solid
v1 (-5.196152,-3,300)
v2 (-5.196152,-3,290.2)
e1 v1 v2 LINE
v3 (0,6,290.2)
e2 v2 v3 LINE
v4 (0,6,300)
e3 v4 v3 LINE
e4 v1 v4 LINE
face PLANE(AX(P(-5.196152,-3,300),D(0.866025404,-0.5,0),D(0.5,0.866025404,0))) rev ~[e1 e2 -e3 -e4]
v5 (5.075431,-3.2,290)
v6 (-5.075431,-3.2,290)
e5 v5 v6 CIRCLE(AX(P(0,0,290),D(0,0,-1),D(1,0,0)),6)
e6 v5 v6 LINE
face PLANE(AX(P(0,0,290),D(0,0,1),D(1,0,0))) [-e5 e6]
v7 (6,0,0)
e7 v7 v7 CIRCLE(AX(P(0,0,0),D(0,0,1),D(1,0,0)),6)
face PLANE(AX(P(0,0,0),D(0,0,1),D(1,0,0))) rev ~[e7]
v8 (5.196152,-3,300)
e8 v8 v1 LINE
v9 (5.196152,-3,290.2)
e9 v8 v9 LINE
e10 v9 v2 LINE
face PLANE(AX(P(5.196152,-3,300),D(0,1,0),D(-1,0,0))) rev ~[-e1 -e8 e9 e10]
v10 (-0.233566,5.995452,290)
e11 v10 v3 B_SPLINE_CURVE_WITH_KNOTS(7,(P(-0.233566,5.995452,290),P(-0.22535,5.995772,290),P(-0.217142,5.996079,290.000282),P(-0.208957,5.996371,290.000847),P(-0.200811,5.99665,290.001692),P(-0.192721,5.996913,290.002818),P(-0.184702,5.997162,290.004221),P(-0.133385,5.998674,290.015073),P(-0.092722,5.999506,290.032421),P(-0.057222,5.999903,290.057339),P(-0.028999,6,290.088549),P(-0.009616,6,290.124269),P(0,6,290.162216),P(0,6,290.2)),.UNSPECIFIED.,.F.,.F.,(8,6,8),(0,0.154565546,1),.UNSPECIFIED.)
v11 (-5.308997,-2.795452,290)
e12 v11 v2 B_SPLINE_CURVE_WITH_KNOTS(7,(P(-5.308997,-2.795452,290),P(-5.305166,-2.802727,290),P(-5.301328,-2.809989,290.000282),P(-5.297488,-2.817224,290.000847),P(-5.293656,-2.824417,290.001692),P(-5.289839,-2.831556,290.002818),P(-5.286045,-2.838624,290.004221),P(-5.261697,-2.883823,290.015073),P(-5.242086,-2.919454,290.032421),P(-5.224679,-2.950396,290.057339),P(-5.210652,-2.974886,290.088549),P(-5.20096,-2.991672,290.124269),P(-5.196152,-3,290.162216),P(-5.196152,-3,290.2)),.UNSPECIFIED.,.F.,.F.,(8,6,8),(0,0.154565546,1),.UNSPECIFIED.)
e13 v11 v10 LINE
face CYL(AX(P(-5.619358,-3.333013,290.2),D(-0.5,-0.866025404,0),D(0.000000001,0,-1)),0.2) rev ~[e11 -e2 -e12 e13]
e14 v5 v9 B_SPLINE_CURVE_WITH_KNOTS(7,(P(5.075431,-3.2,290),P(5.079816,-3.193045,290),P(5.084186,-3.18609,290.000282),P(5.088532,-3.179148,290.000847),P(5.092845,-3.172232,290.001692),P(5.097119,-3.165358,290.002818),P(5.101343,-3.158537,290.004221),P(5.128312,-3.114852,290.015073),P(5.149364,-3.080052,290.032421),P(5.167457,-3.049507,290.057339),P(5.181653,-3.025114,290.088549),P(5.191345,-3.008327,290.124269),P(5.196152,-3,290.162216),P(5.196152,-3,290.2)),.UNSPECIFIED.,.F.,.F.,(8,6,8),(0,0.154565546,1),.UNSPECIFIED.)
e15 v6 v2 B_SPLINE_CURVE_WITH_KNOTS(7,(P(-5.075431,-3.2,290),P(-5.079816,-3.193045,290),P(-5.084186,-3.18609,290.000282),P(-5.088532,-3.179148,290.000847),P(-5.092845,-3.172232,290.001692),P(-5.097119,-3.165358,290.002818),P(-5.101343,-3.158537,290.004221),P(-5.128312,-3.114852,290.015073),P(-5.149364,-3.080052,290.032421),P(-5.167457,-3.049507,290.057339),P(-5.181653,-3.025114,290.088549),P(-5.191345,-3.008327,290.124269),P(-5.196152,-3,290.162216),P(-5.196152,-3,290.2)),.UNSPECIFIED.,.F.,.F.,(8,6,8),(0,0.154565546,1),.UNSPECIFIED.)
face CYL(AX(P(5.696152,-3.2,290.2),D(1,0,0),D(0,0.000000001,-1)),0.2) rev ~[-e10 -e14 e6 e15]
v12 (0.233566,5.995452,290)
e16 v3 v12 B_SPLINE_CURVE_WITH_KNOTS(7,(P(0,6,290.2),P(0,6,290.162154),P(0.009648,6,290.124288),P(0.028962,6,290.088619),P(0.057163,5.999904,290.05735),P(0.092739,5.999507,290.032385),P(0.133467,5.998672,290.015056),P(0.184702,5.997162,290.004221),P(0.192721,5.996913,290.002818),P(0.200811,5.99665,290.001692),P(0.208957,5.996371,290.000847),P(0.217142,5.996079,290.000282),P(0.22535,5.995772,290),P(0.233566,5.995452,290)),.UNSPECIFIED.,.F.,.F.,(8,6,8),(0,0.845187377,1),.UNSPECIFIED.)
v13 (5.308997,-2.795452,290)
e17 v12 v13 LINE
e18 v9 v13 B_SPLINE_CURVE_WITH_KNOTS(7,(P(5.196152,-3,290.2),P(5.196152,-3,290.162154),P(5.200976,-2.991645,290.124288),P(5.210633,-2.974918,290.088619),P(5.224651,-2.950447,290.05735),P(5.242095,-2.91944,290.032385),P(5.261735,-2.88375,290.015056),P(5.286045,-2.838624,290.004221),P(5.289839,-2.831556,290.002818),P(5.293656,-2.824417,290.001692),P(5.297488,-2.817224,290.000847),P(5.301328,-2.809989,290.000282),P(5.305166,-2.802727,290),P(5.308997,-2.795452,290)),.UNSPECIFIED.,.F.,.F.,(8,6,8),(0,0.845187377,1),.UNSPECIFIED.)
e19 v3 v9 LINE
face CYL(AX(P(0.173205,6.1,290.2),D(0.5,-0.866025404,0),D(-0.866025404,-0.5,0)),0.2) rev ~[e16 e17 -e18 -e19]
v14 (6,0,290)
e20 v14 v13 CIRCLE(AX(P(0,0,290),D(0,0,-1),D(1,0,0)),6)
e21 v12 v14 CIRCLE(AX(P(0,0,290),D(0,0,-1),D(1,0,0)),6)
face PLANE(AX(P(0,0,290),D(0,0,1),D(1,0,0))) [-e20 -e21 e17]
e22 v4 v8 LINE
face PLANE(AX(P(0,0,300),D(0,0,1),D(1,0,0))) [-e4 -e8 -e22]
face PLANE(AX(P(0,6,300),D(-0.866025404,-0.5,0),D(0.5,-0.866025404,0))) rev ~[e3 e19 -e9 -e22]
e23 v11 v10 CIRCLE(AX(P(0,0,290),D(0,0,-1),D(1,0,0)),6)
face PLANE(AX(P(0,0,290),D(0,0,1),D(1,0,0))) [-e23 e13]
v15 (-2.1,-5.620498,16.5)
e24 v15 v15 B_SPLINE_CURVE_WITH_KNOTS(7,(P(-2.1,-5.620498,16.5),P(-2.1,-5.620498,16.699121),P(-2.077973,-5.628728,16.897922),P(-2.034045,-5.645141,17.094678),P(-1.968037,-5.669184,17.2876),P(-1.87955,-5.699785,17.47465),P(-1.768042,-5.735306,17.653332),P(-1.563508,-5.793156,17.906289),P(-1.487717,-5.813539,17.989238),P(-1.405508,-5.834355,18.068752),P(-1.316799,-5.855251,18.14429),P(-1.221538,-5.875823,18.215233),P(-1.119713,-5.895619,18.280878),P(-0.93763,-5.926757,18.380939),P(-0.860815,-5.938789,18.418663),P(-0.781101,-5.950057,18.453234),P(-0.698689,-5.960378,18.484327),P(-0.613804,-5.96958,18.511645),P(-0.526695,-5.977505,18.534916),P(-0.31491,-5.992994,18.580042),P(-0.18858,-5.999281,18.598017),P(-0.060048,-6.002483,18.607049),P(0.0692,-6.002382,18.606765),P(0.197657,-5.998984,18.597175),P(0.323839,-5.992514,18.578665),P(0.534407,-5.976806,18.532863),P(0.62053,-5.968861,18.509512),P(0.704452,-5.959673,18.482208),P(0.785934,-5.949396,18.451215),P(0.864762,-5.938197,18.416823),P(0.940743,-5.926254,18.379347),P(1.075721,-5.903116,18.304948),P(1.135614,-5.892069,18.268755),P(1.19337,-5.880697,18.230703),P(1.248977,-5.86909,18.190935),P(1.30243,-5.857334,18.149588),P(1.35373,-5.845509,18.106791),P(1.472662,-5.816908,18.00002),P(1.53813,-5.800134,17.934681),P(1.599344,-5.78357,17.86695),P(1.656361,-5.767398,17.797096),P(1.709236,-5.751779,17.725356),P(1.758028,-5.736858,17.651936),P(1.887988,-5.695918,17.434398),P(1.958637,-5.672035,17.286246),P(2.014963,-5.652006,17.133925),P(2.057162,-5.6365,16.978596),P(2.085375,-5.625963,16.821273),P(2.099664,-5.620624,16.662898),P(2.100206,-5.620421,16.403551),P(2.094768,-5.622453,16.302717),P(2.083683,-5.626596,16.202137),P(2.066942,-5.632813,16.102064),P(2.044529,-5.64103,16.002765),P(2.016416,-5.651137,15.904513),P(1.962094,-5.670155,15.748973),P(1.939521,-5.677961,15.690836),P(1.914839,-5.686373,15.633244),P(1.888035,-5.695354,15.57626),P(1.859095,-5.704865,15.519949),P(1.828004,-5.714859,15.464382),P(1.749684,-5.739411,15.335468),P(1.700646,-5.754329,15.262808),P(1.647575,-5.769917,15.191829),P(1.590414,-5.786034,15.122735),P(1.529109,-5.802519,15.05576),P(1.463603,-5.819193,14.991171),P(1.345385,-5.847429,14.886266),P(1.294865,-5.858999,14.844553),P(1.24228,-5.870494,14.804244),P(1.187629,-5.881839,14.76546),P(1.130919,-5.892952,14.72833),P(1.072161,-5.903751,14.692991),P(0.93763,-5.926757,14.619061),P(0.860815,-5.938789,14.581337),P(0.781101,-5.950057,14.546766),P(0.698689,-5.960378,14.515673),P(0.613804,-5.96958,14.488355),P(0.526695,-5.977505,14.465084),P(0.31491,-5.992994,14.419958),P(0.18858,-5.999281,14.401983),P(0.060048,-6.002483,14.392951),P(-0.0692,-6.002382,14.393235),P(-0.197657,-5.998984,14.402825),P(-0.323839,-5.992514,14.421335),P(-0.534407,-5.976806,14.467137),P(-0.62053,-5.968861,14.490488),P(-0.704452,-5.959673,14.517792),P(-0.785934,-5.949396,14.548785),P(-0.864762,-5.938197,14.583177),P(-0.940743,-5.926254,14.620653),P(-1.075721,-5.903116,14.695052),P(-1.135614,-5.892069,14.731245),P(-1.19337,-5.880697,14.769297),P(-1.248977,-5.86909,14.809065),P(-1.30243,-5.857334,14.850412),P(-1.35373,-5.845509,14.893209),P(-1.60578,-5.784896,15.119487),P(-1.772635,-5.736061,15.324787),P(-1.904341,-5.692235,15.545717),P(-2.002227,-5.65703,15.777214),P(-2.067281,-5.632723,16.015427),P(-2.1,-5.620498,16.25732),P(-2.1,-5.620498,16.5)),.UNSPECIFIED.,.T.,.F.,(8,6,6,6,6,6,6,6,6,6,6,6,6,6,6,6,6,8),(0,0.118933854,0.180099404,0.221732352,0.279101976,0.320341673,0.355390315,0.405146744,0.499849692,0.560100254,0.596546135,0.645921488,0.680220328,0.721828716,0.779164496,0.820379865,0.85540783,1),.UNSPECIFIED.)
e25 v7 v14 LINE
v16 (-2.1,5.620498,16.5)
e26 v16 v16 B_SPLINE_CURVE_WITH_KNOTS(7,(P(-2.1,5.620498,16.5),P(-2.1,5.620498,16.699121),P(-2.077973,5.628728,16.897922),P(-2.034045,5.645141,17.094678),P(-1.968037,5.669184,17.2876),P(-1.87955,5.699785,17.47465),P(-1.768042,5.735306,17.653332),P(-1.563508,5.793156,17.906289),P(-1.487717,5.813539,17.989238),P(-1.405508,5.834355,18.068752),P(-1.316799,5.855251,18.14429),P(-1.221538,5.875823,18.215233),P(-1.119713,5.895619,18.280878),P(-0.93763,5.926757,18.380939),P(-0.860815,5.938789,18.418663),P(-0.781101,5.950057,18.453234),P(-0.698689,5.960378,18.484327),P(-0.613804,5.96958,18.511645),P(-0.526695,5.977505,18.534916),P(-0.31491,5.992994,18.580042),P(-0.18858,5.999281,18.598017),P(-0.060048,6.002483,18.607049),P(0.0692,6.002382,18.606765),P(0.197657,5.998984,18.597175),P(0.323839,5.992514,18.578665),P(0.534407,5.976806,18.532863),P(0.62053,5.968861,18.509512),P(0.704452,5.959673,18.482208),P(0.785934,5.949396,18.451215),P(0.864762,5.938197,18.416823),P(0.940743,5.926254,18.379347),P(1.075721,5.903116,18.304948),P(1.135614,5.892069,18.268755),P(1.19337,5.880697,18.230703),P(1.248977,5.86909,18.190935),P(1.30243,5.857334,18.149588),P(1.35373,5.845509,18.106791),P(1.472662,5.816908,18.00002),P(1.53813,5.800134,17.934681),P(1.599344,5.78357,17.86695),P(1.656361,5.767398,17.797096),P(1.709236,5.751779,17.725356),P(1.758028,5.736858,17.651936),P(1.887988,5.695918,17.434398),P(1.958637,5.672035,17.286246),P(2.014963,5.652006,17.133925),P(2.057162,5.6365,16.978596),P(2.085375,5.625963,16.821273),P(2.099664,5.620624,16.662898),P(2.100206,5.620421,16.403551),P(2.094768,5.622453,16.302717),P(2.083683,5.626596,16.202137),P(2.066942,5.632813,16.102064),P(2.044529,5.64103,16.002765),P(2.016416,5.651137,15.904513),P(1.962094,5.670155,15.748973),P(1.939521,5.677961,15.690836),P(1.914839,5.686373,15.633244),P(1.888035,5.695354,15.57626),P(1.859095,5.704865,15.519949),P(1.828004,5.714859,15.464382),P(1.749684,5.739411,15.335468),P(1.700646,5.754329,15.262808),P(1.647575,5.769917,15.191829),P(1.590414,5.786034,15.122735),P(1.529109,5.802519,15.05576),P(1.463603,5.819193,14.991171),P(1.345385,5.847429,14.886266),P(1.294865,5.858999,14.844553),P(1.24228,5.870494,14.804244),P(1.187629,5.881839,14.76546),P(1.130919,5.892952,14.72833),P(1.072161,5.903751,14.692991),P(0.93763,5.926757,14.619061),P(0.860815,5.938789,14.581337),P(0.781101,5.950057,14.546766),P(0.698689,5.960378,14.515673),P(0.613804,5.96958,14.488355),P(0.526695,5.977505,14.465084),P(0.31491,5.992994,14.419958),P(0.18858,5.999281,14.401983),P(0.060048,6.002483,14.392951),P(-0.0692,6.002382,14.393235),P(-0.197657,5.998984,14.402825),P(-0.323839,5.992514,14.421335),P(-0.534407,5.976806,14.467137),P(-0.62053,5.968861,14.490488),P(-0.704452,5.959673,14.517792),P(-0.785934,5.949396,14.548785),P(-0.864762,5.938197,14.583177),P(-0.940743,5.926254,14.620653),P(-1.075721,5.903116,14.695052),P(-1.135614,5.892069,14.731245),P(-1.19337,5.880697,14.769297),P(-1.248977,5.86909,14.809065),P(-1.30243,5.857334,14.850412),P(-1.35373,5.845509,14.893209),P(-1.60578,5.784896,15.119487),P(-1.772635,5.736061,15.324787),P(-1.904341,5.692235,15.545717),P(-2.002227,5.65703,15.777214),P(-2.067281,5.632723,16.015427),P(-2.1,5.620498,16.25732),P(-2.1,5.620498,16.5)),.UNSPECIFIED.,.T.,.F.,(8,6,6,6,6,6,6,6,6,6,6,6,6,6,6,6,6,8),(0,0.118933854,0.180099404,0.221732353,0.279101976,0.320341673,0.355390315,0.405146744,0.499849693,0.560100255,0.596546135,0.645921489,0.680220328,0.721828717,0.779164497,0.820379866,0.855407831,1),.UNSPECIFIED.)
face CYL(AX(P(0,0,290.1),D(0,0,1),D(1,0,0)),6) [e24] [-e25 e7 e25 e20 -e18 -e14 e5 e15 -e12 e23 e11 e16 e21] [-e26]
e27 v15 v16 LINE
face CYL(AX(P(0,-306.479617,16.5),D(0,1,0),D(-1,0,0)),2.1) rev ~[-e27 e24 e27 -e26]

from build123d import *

# Parameters (mm, degrees)
F0_R        = 6
F1_DEPTH    = 300
F2_R        = 11
F3_DEPTH    = 10
F4_T4_DEPTH = 11.3923048454
F4_S5_R     = 6
F4_T6_DEPTH = 7
F5_T4_DEPTH = 11.3923048454
F5_S5_R     = 6
F5_T6_DEPTH = 7
F6_R        = 0.2
F9_D        = 4.2


# Not quite as in the source:
# - a fillet or chamfer that OpenCascade refuses, or shapes differently, is made with other operations: its cross-section is extruded or revolved along the edge and cut away or added


with BuildPart() as f1:
    # F0 (on Top) → F1 (new body)
    with BuildSketch(Plane.XY):
        Circle(F0_R)
    extrude(amount=F1_DEPTH)

    # F2 (on face) → F3 (cut)
    with BuildSketch(Plane.XY.offset(300)):
        Circle(F2_R)
        Polygon((5.1961524227, -3), (-5.1961524227, -3), (0, 6), align=None, mode=Mode.SUBTRACT)
    extrude(amount=-F3_DEPTH, mode=Mode.SUBTRACT)

    # F4: fillet of radius 0.2 on 1 edges, made by hand


with BuildPart() as f4_tool2:
    # F4_s3 → F4_t4 (new body)
    with BuildSketch(Plane.YZ.offset(5.6961524227)):
        with BuildLine():
            ThreePointArc((-3.2, 290), (-3.0585786438, 290.0585786438), (-3, 290.2))
            Line((-3, 290.2), (-3, 290))
            Line((-3, 290), (-3.2, 290))
        make_face()
    extrude(amount=-F4_T4_DEPTH)

    # F4_s5 → F4_t6 (intersect, symmetric)
    with BuildSketch(Plane.XY.offset(290.1)):
        Circle(F4_S5_R)
    extrude(amount=F4_T6_DEPTH, both=True, mode=Mode.INTERSECT)

    split(bisect_by=Plane(origin=(2.5980762114, 1.5, 0), x_dir=(0, 0, 1), z_dir=(-0.8660254038, -0.5, 0)), keep=Keep.TOP)

    split(bisect_by=Plane(origin=(-2.5980762114, 1.5, 0), x_dir=(0, 0, 1), z_dir=(0.8660254038, -0.5, 0)), keep=Keep.TOP)


with BuildPart() as f1_1:
    add(f1.part)

    # F4_t1: union F4_tool2
    add(f4_tool2.part)

    # F5: fillet of radius 0.2 on 1 edges, made by hand


with BuildPart() as f5_tool2:
    # F5_s3 → F5_t4 (new body)
    with BuildSketch(Plane(origin=(-2.8480762114, -4.9330127019, 0), x_dir=(0, 0, 1), z_dir=(0.5, 0.8660254038, 0))):
        with BuildLine():
            ThreePointArc((290, -3.2), (290.0585786438, -3.0585786438), (290.2, -3))
            Line((290.2, -3), (290, -3))
            Line((290, -3), (290, -3.2))
        make_face()
    extrude(amount=F5_T4_DEPTH)

    # F5_s5 → F5_t6 (intersect, symmetric)
    with BuildSketch(Plane.XY.offset(290.1)):
        Circle(F5_S5_R)
    extrude(amount=F5_T6_DEPTH, both=True, mode=Mode.INTERSECT)

    split(bisect_by=Plane(origin=(2.5980762114, 1.5, 0), x_dir=(0, 0, 1), z_dir=(-0.8660254038, -0.5, 0)), keep=Keep.TOP)


with BuildPart() as f1_2:
    add(f1_1.part)

    # F5_t1: union F5_tool2
    add(f5_tool2.part)

    # F6
    f6_edges = [f1_2.edges().sort_by_distance(p)[0] for p in [
        (2.598076, 1.5, 290),
    ]]
    fillet(f6_edges, radius=F6_R)

    # F9 (through all)
    with Locations(Plane.XZ.offset(6)):
        with Locations((0, 16.5)):
            Hole(F9_D / 2)


solid = f1_2.part
